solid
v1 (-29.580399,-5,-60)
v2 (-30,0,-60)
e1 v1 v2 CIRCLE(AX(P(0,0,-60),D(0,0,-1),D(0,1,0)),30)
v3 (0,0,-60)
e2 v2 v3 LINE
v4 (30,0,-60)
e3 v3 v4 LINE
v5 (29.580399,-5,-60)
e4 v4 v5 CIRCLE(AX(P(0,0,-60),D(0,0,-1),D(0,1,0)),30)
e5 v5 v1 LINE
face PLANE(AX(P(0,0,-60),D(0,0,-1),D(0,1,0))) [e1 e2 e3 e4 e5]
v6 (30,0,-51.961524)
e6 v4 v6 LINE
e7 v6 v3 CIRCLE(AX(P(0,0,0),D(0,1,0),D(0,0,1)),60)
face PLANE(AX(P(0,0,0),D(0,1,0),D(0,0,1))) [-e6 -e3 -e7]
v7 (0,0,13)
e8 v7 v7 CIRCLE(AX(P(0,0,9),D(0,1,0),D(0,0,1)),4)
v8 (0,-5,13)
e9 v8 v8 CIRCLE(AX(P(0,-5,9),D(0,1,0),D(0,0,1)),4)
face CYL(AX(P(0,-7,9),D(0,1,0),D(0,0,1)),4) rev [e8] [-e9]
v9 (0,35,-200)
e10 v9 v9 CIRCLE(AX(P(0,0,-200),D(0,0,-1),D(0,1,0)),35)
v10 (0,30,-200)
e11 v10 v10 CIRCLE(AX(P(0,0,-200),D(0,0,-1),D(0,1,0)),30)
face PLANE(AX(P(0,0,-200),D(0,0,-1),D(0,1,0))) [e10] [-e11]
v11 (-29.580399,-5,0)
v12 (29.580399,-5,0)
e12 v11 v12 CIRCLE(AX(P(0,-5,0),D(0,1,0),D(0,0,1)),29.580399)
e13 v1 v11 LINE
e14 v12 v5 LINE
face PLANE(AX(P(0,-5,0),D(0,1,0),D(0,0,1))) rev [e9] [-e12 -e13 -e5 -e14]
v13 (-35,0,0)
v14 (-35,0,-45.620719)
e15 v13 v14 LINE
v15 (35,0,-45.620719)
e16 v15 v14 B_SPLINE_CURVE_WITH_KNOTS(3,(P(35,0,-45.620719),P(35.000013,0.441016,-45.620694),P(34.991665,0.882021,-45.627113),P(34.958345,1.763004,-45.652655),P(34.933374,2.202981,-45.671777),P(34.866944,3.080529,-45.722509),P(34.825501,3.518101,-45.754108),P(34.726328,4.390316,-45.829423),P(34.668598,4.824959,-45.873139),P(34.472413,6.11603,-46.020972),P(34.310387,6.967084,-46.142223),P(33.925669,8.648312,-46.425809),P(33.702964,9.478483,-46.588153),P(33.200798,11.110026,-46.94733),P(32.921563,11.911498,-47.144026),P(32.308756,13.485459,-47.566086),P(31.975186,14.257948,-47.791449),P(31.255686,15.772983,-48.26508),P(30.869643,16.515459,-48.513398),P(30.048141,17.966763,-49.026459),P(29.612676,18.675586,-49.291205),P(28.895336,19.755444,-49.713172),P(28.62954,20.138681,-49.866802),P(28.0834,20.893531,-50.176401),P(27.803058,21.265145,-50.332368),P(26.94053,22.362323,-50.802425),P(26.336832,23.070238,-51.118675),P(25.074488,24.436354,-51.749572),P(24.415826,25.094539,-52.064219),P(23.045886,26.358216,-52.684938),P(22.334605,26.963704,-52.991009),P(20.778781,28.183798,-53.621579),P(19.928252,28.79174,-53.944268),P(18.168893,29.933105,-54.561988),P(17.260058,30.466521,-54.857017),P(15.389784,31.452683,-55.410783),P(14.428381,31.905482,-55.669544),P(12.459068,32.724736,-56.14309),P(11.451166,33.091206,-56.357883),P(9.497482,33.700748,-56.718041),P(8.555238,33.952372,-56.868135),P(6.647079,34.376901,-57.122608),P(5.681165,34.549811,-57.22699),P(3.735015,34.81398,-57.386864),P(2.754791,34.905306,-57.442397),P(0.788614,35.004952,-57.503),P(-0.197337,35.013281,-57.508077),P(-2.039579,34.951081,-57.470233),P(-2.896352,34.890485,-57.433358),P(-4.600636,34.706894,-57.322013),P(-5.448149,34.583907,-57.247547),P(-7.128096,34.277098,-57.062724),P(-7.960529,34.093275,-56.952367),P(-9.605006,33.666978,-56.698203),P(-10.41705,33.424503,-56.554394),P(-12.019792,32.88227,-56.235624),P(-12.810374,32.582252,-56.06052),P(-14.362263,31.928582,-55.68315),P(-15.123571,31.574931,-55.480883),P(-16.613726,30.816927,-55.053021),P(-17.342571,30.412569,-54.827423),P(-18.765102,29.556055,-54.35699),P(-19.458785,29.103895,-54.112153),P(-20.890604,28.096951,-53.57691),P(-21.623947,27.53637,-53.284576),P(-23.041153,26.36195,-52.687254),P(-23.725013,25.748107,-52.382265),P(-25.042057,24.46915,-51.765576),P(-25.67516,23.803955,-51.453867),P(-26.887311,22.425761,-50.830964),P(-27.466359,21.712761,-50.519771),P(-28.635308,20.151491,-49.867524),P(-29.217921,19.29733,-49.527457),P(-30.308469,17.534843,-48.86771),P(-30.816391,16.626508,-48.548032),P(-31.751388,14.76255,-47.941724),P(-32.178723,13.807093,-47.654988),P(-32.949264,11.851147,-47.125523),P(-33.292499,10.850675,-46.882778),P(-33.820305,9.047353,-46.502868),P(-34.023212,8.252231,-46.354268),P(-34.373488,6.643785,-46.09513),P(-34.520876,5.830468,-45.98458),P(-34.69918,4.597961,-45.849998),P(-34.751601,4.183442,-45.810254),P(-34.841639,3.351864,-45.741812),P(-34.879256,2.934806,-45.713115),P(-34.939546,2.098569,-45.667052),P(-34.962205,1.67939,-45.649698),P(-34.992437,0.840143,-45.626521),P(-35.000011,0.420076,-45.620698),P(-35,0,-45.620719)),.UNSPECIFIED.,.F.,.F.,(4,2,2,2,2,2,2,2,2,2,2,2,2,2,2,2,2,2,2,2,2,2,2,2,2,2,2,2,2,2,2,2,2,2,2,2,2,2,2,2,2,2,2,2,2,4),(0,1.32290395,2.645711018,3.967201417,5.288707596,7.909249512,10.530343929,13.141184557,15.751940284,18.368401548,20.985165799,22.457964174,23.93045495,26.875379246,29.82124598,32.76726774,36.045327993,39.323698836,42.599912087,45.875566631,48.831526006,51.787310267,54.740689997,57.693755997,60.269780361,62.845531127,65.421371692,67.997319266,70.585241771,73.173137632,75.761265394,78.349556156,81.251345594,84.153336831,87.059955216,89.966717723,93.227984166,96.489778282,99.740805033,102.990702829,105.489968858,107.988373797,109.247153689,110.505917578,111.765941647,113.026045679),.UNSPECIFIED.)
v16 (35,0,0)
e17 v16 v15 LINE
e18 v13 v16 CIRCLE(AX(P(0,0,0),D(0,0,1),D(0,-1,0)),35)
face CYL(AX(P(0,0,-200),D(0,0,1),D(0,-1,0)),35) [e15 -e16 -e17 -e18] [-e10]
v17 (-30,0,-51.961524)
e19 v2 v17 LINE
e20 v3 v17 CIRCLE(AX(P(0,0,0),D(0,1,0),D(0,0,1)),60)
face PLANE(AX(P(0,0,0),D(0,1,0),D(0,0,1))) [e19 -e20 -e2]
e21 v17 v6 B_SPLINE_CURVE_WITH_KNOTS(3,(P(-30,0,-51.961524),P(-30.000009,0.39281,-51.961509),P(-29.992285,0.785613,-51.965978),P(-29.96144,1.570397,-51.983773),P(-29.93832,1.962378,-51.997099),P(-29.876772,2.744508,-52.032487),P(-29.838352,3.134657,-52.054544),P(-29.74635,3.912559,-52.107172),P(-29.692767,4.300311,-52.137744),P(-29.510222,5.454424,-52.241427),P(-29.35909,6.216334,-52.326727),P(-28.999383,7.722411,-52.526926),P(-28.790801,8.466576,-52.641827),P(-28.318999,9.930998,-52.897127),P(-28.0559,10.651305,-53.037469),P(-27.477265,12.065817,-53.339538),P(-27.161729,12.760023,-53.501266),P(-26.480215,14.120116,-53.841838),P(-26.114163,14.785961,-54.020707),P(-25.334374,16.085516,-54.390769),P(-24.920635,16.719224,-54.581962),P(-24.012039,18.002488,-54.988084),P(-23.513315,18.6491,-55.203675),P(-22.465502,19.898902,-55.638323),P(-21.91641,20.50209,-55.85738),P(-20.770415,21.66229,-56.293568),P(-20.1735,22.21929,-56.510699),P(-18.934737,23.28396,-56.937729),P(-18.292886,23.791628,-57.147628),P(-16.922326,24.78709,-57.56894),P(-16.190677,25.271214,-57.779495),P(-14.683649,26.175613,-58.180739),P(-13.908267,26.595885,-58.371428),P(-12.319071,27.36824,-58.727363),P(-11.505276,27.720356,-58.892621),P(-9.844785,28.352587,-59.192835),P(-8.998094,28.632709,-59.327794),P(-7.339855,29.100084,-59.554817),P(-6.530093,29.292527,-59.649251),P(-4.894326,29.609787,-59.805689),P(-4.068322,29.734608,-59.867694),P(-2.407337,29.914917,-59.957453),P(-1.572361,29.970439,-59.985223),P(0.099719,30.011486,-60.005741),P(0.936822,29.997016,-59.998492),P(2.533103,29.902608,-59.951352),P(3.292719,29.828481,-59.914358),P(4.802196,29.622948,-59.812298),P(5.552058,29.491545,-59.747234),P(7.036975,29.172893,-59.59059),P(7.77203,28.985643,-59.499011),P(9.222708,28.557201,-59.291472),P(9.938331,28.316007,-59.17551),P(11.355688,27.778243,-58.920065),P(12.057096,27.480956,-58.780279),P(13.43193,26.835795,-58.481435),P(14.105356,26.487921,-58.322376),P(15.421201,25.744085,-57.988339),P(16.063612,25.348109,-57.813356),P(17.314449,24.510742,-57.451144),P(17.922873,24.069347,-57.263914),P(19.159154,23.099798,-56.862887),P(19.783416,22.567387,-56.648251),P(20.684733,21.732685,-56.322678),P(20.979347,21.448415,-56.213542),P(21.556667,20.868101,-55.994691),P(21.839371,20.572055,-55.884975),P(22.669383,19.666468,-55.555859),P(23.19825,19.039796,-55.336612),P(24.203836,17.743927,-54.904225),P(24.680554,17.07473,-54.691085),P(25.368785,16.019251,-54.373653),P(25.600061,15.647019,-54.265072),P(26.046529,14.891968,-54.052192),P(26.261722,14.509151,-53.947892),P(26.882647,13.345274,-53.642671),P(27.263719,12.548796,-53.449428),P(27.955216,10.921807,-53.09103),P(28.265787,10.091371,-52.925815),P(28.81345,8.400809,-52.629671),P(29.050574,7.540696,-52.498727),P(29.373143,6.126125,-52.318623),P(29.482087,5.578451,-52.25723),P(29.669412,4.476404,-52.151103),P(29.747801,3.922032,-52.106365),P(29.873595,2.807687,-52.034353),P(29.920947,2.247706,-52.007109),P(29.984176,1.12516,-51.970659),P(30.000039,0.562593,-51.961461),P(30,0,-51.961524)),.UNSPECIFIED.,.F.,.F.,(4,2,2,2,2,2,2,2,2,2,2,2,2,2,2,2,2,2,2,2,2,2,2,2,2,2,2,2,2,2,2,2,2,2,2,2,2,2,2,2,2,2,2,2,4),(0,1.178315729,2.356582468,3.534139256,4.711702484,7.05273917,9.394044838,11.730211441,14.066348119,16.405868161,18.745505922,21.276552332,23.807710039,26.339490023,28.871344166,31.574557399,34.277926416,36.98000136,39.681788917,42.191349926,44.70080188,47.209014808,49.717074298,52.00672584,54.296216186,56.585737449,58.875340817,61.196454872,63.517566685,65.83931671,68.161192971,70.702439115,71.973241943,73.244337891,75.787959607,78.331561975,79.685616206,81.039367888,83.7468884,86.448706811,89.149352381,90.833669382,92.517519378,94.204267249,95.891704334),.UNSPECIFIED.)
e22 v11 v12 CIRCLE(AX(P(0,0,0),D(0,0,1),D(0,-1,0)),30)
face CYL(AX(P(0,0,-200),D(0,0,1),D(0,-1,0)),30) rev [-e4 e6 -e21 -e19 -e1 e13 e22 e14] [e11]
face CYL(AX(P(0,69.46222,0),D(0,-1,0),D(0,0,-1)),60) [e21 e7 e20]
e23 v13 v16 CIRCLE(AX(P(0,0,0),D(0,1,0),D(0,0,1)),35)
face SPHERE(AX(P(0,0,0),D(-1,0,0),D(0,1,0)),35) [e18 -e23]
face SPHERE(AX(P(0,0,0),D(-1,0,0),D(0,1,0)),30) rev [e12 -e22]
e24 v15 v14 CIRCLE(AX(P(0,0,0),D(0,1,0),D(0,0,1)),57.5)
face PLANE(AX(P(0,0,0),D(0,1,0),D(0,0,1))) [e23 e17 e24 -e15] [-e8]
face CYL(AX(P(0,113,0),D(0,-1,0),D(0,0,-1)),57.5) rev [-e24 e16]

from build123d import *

# Parameters (mm, degrees)
REVOLVE1_ANGLE      = 90
SHELL2_T            = -5
SKETCH3_R           = 4
CUT_EXTRUDE1_DEPTH  = 7
SKETCH4_R           = 35
SKETCH4_R_2         = 30
BOSS_EXTRUDE1_DEPTH = 200
BOSS_EXTRUDE3_REACH = 208.034
CUT_EXTRUDE3_DEPTH  = 80
SKETCH6_W           = 60
SKETCH6_H           = 5
BOSS_EXTRUDE4_DEPTH = 60
CUT_EXTRUDE4_DEPTH  = 113
BOSS_EXTRUDE5_REACH = 208.034


with BuildPart() as part:
    # Sketch1 → Revolve1 (revolve)
    with BuildSketch(Plane(origin=(0, 0, 0), x_dir=(1, 0, 0), z_dir=(0, 1, 0))):
        with BuildLine():
            Line((-35, 0), (35, 0))
            ThreePointArc((35, 0), (0, -35), (-35, 0))
        make_face()
    revolve(axis=Axis((-35, 0, 0), (1, 0, 0)), revolution_arc=REVOLVE1_ANGLE)

    # Shell2
    shell2_openings = [part.faces().sort_by_distance(p)[0] for p in [
        (0, -14.854461355, 0),
    ]]
    offset(amount=SHELL2_T, openings=shell2_openings, kind=Kind.INTERSECTION)

    # Sketch3 → Cut-Extrude1 (cut)
    with BuildSketch(Plane(origin=(0, 0, 0), x_dir=(1, 0, 0), z_dir=(0, 1, 0))):
        with Locations(Location((0, -9, 0), (0, 0, 270))):
            Circle(SKETCH3_R)
    extrude(amount=-CUT_EXTRUDE1_DEPTH, mode=Mode.SUBTRACT)

    # Sketch4 → Boss-Extrude1 (add)
    with BuildSketch(Plane(origin=(0, 0, 0), x_dir=(-1, 0, 0), z_dir=(0, 0, -1))):
        Circle(SKETCH4_R)
        with Locations(Location((0, 0, 0), (0, 0, 189.594068227))):
            Circle(SKETCH4_R_2, mode=Mode.SUBTRACT)
    extrude(amount=BOSS_EXTRUDE1_DEPTH)

    # Sketch5 → Boss-Extrude3 (add, up to next)
    with BuildSketch(Plane(origin=(0, 0, 0), x_dir=(1, 0, 0), z_dir=(0, 1, 0)), mode=Mode.PRIVATE) as boss_extrude3_sk1:
        with BuildLine():
            ThreePointArc((-30, 0), (0, 30), (30, 0))
            Line((30, 0), (35, 0))
            ThreePointArc((35, 0), (0, 35), (-35, 0))
            Line((-35, 0), (-30, 0))
        make_face()
    boss_extrude3_tool1 = extrude(boss_extrude3_sk1.sketch, amount=BOSS_EXTRUDE3_REACH, mode=Mode.PRIVATE) - part.part
    add(boss_extrude3_tool1.solids().sort_by_distance((-32.5, 0, -0.782624))[0])

    # Sketch5<5> → Cut-Extrude3 (cut)
    with BuildSketch(Plane(origin=(0, 0, 0), x_dir=(1, 0, 0), z_dir=(0, 1, 0))):
        with BuildLine():
            ThreePointArc((30, 0), (0, 30), (-30, 0))
            Line((-30, 0), (30, 0))
        make_face()
        with BuildLine():
            Line((30, 0), (-30, 0))
            ThreePointArc((-30, 0), (0, -30), (30, 0))
        make_face()
    extrude(amount=CUT_EXTRUDE3_DEPTH, mode=Mode.SUBTRACT)

    # Sketch6 → Boss-Extrude4 (add)
    with BuildSketch(Plane(origin=(0, 0, 0), x_dir=(-1, 0, 0), z_dir=(0, 0, -1))):
        with Locations((0, -2.5)):
            Rectangle(SKETCH6_W, SKETCH6_H)
    extrude(amount=BOSS_EXTRUDE4_DEPTH)

    # Sketch5<7> → Cut-Extrude4 (cut)
    with BuildSketch(Plane(origin=(0, 0, 0), x_dir=(1, 0, 0), z_dir=(0, 1, 0))):
        with BuildLine():
            ThreePointArc((35, 0), (0, 35), (-35, 0))
            Line((-35, 0), (-30, 0))
            ThreePointArc((-30, 0), (0, 30), (30, 0))
            Line((30, 0), (35, 0))
        make_face()
        with BuildLine():
            Line((-30, 0), (-35, 0))
            ThreePointArc((-35, 0), (0, -35), (35, 0))
            Line((35, 0), (30, 0))
            ThreePointArc((30, 0), (0, -30), (-30, 0))
        make_face()
        with BuildLine():
            Line((-35, 45.620718977), (-35, 0))
            ThreePointArc((-35, 0), (0, 35), (35, 0))
            Line((35, 0), (35, 45.620718977))
            Line((35, 45.620718977), (-35, 45.620718977))
        make_face()
        with BuildLine():
            ThreePointArc((35, 45.620718977), (0, 57.5), (-35, 45.620718977))
            Line((-35, 45.620718977), (35, 45.620718977))
        make_face()
    extrude(amount=CUT_EXTRUDE4_DEPTH, mode=Mode.SUBTRACT)

    # Sketch5<9> → Boss-Extrude5 (add, up to next)
    with BuildSketch(Plane(origin=(0, 0, 0), x_dir=(1, 0, 0), z_dir=(0, 1, 0)), mode=Mode.PRIVATE) as boss_extrude5_sk1:
        with BuildLine():
            ThreePointArc((-35, 45.620718977), (0, 57.5), (35, 45.620718977))
            Line((35, 45.620718977), (35, 48.733971724))
            ThreePointArc((35, 48.733971724), (0, 60), (-35, 48.733971724))
            Line((-35, 48.733971724), (-35, 45.620718977))
        make_face()
    boss_extrude5_tool1 = extrude(boss_extrude5_sk1.sketch, amount=BOSS_EXTRUDE5_REACH, mode=Mode.PRIVATE) - part.part
    add(boss_extrude5_tool1.solids().sort_by_distance((0, 0, -59.285384))[0])


solid = part.part
